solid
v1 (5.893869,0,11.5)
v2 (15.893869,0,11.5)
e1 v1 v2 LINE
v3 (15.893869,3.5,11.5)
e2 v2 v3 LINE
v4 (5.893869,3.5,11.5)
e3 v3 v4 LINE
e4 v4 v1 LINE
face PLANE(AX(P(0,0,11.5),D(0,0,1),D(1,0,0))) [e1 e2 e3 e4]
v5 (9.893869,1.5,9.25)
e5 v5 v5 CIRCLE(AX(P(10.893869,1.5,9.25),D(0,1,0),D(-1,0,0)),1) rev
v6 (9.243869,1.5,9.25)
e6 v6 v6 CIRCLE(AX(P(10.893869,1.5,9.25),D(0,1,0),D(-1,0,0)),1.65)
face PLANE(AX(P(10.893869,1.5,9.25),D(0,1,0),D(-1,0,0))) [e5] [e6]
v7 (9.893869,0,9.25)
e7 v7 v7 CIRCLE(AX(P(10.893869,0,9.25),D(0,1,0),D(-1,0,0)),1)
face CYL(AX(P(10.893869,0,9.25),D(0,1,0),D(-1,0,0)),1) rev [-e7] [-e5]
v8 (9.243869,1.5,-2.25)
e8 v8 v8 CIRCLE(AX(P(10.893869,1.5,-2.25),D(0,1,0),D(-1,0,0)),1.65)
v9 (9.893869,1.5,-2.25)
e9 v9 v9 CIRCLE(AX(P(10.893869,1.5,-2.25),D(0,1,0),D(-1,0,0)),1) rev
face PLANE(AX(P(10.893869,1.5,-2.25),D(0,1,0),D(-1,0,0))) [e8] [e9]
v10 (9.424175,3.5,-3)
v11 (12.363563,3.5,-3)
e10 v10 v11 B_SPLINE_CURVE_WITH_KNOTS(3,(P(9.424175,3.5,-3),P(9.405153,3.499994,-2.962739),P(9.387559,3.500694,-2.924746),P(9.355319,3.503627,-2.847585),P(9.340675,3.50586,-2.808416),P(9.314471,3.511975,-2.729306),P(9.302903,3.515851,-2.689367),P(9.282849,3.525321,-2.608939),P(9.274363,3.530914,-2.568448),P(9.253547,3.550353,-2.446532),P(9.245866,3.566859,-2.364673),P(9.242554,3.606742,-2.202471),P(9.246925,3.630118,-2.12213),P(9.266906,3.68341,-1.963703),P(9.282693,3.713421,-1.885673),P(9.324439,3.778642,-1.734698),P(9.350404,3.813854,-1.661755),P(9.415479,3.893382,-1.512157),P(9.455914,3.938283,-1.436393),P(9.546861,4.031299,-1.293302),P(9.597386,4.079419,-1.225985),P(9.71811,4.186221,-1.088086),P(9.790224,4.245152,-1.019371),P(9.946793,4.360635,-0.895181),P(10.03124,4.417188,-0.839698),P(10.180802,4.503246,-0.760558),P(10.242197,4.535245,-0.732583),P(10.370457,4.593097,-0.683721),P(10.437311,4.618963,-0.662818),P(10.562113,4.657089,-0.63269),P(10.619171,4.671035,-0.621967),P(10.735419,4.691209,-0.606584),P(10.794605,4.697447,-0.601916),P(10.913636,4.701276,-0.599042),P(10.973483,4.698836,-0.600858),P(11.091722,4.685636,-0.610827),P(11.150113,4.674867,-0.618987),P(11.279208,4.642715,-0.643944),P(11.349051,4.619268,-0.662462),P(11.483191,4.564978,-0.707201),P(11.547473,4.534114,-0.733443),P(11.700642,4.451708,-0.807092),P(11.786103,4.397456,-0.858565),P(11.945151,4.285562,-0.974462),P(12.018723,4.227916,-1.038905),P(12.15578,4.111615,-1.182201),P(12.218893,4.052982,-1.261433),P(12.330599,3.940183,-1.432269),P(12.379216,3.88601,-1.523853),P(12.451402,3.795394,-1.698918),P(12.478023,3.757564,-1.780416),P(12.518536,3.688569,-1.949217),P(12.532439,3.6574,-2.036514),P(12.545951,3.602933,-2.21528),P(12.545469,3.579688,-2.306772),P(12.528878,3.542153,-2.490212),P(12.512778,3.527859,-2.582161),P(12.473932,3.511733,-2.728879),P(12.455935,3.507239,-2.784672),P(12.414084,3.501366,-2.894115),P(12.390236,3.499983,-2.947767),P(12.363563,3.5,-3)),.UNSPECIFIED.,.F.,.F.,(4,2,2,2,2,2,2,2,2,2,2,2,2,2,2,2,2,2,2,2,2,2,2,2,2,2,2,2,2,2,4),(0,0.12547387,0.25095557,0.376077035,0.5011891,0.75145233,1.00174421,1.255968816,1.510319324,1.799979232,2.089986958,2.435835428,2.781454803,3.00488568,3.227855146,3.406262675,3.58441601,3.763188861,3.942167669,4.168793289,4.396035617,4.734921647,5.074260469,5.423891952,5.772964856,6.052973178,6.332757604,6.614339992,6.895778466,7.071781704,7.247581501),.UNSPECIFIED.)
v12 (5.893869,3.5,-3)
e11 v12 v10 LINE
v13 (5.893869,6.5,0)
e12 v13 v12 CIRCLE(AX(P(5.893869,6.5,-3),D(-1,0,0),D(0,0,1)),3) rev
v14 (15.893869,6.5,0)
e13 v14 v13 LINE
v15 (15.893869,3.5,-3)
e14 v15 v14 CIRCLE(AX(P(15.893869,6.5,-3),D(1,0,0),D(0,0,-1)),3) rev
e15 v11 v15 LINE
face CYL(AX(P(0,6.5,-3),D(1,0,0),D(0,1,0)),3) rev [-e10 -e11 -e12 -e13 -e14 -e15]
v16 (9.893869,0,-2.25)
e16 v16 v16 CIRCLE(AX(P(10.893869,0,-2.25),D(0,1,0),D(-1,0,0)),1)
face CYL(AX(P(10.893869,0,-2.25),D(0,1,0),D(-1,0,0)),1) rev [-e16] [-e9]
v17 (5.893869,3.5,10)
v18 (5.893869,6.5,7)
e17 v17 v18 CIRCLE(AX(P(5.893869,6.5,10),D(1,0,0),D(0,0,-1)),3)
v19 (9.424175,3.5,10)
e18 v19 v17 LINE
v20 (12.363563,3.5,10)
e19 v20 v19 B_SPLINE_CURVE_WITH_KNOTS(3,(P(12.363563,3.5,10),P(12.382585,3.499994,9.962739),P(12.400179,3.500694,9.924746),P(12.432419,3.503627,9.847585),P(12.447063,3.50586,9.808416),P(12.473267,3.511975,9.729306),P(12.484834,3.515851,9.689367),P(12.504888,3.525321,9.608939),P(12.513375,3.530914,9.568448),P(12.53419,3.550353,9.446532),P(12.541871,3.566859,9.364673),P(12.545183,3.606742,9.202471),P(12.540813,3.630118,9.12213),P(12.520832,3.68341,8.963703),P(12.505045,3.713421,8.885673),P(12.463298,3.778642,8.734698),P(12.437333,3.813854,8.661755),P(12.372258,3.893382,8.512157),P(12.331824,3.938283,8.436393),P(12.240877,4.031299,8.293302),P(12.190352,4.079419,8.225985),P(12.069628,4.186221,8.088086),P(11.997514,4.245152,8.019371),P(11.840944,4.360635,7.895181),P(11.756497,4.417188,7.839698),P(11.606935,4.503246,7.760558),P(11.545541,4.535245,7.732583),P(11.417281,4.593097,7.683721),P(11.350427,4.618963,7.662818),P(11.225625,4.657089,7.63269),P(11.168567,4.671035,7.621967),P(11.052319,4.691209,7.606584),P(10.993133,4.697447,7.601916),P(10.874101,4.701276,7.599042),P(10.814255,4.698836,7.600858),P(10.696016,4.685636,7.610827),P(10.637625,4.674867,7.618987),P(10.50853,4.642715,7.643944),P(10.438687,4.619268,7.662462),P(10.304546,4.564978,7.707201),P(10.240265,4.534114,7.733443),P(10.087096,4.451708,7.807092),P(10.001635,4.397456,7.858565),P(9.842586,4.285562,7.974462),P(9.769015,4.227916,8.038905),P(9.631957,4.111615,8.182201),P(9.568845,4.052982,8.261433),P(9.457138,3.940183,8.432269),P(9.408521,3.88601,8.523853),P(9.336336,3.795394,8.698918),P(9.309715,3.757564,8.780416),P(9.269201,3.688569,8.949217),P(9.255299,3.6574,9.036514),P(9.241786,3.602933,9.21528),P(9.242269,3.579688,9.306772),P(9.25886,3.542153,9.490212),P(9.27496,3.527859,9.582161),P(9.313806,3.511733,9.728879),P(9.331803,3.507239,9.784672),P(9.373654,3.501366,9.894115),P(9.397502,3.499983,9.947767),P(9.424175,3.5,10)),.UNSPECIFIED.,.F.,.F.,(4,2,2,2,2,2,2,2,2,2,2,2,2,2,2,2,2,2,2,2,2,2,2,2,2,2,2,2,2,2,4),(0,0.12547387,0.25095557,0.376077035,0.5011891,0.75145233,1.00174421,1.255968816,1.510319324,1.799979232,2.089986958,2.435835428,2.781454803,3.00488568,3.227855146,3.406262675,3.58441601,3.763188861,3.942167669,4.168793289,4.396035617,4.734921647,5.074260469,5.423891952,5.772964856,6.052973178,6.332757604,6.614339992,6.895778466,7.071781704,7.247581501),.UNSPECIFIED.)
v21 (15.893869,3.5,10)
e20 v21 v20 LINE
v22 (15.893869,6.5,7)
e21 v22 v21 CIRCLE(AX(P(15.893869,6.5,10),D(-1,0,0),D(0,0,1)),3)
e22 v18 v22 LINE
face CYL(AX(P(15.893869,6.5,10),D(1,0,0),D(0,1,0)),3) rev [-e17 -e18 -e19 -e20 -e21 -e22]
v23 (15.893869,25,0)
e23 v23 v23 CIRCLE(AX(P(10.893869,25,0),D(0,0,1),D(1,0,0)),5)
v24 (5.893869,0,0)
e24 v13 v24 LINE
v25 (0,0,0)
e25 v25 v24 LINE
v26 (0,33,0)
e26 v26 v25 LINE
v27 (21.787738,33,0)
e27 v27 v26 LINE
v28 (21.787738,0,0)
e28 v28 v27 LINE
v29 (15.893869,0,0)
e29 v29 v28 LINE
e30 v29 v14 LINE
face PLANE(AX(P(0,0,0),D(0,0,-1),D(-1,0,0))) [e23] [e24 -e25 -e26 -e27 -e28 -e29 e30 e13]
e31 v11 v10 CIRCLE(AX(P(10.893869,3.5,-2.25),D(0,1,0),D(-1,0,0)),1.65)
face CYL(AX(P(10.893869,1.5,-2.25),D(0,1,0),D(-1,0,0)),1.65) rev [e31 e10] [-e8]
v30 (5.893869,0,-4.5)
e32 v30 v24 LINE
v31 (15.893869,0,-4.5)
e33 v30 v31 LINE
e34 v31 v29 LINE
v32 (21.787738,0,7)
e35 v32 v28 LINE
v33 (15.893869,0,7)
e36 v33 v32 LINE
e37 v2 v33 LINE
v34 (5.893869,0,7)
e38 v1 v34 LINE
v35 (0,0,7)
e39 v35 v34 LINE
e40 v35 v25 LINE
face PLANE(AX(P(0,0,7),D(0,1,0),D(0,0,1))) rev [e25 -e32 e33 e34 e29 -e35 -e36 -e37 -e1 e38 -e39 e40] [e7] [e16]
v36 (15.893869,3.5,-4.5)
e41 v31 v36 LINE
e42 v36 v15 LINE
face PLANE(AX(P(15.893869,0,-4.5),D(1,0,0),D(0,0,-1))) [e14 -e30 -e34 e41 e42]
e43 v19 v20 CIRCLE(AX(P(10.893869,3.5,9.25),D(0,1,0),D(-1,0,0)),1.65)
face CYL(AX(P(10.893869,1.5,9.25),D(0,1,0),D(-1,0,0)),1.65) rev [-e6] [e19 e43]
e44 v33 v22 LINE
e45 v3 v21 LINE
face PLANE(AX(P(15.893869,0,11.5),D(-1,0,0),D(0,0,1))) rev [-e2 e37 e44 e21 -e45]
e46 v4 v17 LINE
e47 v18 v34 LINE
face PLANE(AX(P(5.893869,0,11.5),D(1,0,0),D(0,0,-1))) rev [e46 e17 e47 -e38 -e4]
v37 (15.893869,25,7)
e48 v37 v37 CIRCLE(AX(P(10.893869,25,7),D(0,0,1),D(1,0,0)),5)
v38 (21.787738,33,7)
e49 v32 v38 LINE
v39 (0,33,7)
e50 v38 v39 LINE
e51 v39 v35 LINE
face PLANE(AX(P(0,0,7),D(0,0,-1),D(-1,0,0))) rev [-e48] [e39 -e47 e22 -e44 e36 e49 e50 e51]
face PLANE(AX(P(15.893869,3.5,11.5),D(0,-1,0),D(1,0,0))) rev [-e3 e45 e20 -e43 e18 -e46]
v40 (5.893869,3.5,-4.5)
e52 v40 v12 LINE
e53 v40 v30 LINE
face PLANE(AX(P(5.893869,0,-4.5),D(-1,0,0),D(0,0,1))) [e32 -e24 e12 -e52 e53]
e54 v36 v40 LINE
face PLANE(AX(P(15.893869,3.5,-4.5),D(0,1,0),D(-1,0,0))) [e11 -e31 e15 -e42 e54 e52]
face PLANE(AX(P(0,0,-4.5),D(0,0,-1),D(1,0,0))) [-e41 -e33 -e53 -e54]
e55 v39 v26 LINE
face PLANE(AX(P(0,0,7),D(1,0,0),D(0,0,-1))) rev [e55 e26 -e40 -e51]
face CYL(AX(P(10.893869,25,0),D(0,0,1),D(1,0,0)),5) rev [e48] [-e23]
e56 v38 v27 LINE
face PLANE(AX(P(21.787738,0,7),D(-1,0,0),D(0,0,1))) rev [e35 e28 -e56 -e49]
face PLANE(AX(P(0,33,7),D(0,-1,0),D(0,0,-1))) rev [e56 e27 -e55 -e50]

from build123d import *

# Parameters (mm, degrees)
SKETCH1_W           = 21.78773772
SKETCH1_H           = 33
BOSS_EXTRUDE1_DEPTH = 7
SKETCH2_R           = 5
CUT_EXTRUDE1_DEPTH  = 41.158504889
SKETCH3_W           = 10
SKETCH3_H           = 3.5
BOSS_EXTRUDE2_DEPTH = 4.5
SKETCH4_R           = 1
CUT_EXTRUDE2_DEPTH  = 39.434431373
SKETCH5_R           = 1.65
CUT_EXTRUDE3_DEPTH  = 2
FILLET1_R           = 3


with BuildPart() as part:
    # Sketch1 → Boss-Extrude1 (new body)
    with BuildSketch(Plane.XY):
        with Locations((10.89386886, 16.5)):
            Rectangle(SKETCH1_W, SKETCH1_H)
    extrude(amount=BOSS_EXTRUDE1_DEPTH)

    # Sketch2 → Cut-Extrude1 (cut, through all)
    with BuildSketch(Plane.XY.offset(7)):
        with Locations((10.89386886, 25)):
            Circle(SKETCH2_R)
    extrude(amount=-CUT_EXTRUDE1_DEPTH, mode=Mode.SUBTRACT)

    # Sketch3 → Boss-Extrude2 (add)
    with BuildSketch(Plane.XY.offset(7)):
        with Locations((10.89386886, 1.75)):
            Rectangle(SKETCH3_W, SKETCH3_H)
    boss_extrude2 = extrude(amount=BOSS_EXTRUDE2_DEPTH)

    # Mirror1: Boss-Extrude2 across plane
    add(boss_extrude2.mirror(Plane.XY.offset(3.5)))

    # Sketch4 → Cut-Extrude2 (cut, through all)
    with BuildSketch(Plane(origin=(0, 3.5, 0), x_dir=(1, 0, 0), z_dir=(0, 1, 0))):
        with Locations(Location((10.89386886, 2.25, 0), (0, 0, 180))):
            Circle(SKETCH4_R)
        with Locations(Location((10.89386886, -9.25, 0), (0, 0, 180))):
            Circle(SKETCH4_R)
    extrude(amount=-CUT_EXTRUDE2_DEPTH, mode=Mode.SUBTRACT)

    # Sketch5 → Cut-Extrude3 (cut)
    with BuildSketch(Plane(origin=(0, 3.5, 0), x_dir=(1, 0, 0), z_dir=(0, 1, 0))):
        with Locations(Location((10.89386886, 2.25, 0), (0, 0, 180))):
            Circle(SKETCH5_R)
        with Locations(Location((10.89386886, -9.25, 0), (0, 0, 180))):
            Circle(SKETCH5_R)
    extrude(amount=-CUT_EXTRUDE3_DEPTH, mode=Mode.SUBTRACT)

    # Fillet1
    # the kernel refuses this fillet: 3 mm, written as the material it adds along each edge
    with BuildSketch(Plane(origin=(15.89386886, 3.5, 7), x_dir=(0, 1, 0), z_dir=(-1, 0, 0))) as fillet1_piece_1_section:
        with BuildLine():
            CenterArc((FILLET1_R, -FILLET1_R), FILLET1_R, 90, 90)
            Line((0, -FILLET1_R), (0, 0))
            Line((0, 0), (FILLET1_R, 0))
        make_face()
    fillet1_piece_1 = extrude(amount=10, mode=Mode.PRIVATE)
    fillet1_piece_1 = fillet1_piece_1 - Plane(origin=(10.89386886, 4.228948509, 9.25), x_dir=(-1, 0, 0), z_dir=(0, 1, 0)) * Cylinder(1.65, 32, mode=Mode.PRIVATE)
    add(fillet1_piece_1)
    with BuildSketch(Plane(origin=(15.89386886, 3.5, 0), x_dir=(0, 1, 0), z_dir=(-1, 0, 0))) as fillet1_piece_2_section:
        with BuildLine():
            CenterArc((FILLET1_R, FILLET1_R), FILLET1_R, 180, 90)
            Line((0, FILLET1_R), (0, 0))
            Line((0, 0), (FILLET1_R, 0))
        make_face()
    fillet1_piece_2 = extrude(amount=10, mode=Mode.PRIVATE)
    fillet1_piece_2 = fillet1_piece_2 - Plane(origin=(10.89386886, 4.228948802, -2.25), x_dir=(-1, 0, 0), z_dir=(0, 1, 0)) * Cylinder(1.65, 32, mode=Mode.PRIVATE)
    add(fillet1_piece_2)


solid = part.part
